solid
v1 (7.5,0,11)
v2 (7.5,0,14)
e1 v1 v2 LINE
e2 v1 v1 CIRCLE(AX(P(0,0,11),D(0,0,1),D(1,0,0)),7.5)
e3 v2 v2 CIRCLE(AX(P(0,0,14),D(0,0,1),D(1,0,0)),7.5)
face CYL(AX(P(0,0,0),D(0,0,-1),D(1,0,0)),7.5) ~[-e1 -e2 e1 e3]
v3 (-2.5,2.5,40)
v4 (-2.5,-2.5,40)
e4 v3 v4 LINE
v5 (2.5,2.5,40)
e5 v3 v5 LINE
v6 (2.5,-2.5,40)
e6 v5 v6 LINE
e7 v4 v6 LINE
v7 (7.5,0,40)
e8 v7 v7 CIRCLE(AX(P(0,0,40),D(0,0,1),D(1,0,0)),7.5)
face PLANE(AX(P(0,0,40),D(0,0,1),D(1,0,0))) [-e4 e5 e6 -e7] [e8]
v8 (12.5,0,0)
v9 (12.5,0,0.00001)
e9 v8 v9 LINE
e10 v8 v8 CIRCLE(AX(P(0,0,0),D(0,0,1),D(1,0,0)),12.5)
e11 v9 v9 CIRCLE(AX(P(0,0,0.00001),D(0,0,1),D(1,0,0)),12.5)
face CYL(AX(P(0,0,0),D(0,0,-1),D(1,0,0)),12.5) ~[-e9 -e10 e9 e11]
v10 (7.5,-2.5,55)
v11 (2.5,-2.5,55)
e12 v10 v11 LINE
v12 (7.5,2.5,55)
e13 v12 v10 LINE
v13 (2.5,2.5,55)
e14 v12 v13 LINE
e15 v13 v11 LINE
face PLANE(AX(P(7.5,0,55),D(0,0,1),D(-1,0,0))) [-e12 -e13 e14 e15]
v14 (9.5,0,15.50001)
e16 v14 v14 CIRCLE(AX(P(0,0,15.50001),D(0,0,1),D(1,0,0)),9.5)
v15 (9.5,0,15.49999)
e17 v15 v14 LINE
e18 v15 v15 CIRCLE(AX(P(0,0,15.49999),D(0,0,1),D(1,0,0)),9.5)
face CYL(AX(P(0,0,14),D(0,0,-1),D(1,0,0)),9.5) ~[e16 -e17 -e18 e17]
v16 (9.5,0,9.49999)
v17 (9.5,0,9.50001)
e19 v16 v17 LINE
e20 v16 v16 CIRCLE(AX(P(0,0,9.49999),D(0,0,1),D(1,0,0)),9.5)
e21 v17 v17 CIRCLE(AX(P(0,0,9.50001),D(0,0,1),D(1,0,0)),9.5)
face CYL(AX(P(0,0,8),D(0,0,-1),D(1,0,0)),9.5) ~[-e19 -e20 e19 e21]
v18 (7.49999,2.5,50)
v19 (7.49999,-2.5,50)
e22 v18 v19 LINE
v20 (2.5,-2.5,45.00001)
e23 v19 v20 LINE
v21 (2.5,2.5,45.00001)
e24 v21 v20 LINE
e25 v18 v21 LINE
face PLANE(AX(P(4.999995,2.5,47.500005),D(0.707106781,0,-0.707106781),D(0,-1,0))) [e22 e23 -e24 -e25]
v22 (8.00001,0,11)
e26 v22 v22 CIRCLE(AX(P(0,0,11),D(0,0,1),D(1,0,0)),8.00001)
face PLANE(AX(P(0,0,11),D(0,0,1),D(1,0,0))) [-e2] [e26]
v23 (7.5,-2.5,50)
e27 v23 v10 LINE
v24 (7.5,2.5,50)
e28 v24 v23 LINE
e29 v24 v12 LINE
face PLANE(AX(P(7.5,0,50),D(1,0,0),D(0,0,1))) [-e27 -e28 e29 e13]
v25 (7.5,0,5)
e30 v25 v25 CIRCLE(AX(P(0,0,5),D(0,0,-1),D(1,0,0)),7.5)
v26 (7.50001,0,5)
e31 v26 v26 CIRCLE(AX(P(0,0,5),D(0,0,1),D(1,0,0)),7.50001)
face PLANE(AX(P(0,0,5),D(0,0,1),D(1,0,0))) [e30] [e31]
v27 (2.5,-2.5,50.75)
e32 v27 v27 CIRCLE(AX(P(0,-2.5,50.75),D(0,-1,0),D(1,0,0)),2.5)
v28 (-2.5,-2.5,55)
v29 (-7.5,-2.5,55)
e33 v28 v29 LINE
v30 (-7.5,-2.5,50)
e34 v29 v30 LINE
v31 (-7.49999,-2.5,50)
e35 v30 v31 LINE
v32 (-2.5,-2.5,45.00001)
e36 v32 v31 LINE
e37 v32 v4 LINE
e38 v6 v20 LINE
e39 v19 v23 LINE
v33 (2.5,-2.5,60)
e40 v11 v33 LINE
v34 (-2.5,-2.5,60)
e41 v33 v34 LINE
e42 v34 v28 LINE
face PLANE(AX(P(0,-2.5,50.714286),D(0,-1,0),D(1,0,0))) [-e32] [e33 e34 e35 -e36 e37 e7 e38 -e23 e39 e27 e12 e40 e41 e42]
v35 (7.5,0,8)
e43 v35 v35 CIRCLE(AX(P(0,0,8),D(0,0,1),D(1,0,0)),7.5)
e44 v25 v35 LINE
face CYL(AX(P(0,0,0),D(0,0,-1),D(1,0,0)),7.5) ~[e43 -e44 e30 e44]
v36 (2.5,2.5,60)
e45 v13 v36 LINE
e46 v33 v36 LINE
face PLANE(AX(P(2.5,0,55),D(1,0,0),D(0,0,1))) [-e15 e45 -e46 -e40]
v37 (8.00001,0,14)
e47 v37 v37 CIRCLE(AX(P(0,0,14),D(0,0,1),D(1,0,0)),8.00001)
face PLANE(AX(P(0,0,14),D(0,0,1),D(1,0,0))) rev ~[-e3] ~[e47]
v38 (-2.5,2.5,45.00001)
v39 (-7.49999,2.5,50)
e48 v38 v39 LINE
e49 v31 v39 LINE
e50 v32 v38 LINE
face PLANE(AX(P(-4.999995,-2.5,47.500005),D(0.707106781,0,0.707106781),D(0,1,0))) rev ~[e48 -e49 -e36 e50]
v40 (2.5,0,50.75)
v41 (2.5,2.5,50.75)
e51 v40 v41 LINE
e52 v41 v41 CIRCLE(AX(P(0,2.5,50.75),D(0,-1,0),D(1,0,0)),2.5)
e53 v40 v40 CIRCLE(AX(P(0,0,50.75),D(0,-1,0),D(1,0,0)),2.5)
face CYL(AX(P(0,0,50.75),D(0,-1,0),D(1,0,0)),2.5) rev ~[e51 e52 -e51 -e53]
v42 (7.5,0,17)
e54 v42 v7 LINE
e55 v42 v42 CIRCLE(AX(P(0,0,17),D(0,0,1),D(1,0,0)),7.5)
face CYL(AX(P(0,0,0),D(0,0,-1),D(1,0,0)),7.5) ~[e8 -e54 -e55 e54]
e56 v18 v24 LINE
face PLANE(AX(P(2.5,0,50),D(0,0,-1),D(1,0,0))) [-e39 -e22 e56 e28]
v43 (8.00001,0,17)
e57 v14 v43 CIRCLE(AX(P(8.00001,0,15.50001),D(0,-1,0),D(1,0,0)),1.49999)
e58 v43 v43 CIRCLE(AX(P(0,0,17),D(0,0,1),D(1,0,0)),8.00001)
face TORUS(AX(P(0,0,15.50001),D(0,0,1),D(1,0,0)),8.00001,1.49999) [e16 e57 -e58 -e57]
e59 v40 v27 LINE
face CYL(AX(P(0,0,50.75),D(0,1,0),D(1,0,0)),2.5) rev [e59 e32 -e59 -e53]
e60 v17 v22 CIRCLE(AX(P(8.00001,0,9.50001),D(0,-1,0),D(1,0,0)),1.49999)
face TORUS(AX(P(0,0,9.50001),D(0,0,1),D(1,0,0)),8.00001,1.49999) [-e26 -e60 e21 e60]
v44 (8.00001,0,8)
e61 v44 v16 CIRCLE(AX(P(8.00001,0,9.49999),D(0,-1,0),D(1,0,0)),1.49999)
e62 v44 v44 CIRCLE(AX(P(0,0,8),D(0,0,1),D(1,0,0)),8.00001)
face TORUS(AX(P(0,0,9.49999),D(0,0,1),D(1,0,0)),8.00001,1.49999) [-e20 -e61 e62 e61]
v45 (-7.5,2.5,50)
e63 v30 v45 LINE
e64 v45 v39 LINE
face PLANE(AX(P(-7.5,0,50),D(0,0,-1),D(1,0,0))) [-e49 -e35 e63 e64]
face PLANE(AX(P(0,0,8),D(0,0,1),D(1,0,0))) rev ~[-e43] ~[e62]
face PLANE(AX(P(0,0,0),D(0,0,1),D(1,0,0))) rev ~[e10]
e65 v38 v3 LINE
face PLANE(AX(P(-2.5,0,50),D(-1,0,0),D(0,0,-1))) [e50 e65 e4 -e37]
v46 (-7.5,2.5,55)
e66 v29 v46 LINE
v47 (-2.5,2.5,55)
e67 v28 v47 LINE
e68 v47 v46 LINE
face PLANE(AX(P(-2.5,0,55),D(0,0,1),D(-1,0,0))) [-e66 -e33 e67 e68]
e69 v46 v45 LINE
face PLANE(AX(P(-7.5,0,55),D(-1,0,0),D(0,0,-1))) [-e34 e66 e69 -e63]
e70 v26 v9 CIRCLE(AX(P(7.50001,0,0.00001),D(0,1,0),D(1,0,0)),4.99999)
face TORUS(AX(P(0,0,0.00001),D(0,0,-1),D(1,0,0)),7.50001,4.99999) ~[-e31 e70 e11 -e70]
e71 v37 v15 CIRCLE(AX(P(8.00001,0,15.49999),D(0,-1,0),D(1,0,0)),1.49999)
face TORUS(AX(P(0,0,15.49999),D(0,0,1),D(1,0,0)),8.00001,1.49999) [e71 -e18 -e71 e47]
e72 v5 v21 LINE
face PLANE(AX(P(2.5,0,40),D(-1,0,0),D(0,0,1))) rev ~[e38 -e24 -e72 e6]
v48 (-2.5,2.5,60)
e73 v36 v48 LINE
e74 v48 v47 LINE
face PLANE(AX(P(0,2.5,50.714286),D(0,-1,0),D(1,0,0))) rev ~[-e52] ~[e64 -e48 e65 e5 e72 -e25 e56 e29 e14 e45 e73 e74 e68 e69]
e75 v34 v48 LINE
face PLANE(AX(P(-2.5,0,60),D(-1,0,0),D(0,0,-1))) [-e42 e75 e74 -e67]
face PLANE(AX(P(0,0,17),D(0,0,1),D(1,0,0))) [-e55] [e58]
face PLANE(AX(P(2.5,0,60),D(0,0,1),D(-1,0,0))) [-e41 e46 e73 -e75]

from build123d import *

# Parameters (mm, degrees)
F3_R           = 12.5
F3_R_2         = 9.5
F3_R_3         = 7.5
F4_DEPTH       = 5
F5_DEPTH       = 40
F6_START       = 8
F6_DEPTH       = 3
F7_START       = 14
F7_DEPTH       = 3
F8_R           = 1.49999
F9_R           = 1.49999
F10_R          = 4.99999
F14_R          = 2.5
F15_DEPTH      = 2.5
F15_DEPTH_BACK = 2.5
F16_SIZE       = 4.99999


# Not quite as in the source:
# - a fillet or chamfer is up to 0.001 mm smaller than in the source, because OpenCascade refuses the exact size


with BuildPart() as f4:
    # F3 (on Top) → F4 (new body)
    with BuildSketch(Plane.XY):
        Circle(F3_R)
        Circle(F3_R_2, mode=Mode.SUBTRACT)
        Circle(F3_R_2)
        Circle(F3_R_3, mode=Mode.SUBTRACT)
        Circle(F3_R_3)
    extrude(amount=F4_DEPTH)

    # F3 (on Top) → F5 (join)
    with BuildSketch(Plane.XY):
        Circle(F3_R_3)
    extrude(amount=F5_DEPTH)

    # F3 (on Top) → F6 (join)
    with BuildSketch(Plane.XY.offset(F6_START)):
        Circle(F3_R_2)
        Circle(F3_R_3, mode=Mode.SUBTRACT)
    extrude(amount=F6_DEPTH)

    # F3 (on Top) → F7 (join)
    with BuildSketch(Plane.XY.offset(F7_START)):
        Circle(F3_R_2)
        Circle(F3_R_3, mode=Mode.SUBTRACT)
    extrude(amount=F7_DEPTH)

    # F8 (radius 1.5 in the source; OpenCascade refuses exactly that, so slightly less here)
    f8_edges = [f4.edges().sort_by_distance(p)[0] for p in [
        (-9.5, 0, 8),
        (-9.5, 0, 11),
    ]]
    fillet(f8_edges, radius=F8_R)

    # F9 (radius 1.5 in the source; OpenCascade refuses exactly that, so slightly less here)
    f9_edges = [f4.edges().sort_by_distance(p)[0] for p in [
        (-9.5, 0, 14),
        (-9.5, 0, 17),
    ]]
    fillet(f9_edges, radius=F9_R)

    # F10 (radius 5 in the source; OpenCascade refuses exactly that, so slightly less here)
    f10_edges = [f4.edges().sort_by_distance(p)[0] for p in [
        (-12.5, 0, 5),
    ]]
    fillet(f10_edges, radius=F10_R)

    # F14 (on Front) → F15 (join, two sides)
    with BuildSketch(Plane.XZ) as f15_sk:
        Polygon((-2.5, 50), (-2.5, 40), (2.5, 40), (2.5, 50), (7.5, 50), (7.5, 55), (2.5, 55), (2.5, 60), (-2.5, 60), (-2.5, 55), (-7.5, 55), (-7.5, 50), align=None)
        with Locations((0, 50.75)):
            Circle(F14_R, mode=Mode.SUBTRACT)
    extrude(amount=F15_DEPTH)
    extrude(f15_sk.sketch, amount=-F15_DEPTH_BACK)

    # F16 (size 5 in the source; OpenCascade refuses exactly that, so slightly less here)
    f16_edges = [f4.edges().sort_by_distance(p)[0] for p in [
        (-2.5, 0, 50),
        (2.5, 0, 50),
    ]]
    chamfer(f16_edges, length=F16_SIZE)


solid = f4.part
